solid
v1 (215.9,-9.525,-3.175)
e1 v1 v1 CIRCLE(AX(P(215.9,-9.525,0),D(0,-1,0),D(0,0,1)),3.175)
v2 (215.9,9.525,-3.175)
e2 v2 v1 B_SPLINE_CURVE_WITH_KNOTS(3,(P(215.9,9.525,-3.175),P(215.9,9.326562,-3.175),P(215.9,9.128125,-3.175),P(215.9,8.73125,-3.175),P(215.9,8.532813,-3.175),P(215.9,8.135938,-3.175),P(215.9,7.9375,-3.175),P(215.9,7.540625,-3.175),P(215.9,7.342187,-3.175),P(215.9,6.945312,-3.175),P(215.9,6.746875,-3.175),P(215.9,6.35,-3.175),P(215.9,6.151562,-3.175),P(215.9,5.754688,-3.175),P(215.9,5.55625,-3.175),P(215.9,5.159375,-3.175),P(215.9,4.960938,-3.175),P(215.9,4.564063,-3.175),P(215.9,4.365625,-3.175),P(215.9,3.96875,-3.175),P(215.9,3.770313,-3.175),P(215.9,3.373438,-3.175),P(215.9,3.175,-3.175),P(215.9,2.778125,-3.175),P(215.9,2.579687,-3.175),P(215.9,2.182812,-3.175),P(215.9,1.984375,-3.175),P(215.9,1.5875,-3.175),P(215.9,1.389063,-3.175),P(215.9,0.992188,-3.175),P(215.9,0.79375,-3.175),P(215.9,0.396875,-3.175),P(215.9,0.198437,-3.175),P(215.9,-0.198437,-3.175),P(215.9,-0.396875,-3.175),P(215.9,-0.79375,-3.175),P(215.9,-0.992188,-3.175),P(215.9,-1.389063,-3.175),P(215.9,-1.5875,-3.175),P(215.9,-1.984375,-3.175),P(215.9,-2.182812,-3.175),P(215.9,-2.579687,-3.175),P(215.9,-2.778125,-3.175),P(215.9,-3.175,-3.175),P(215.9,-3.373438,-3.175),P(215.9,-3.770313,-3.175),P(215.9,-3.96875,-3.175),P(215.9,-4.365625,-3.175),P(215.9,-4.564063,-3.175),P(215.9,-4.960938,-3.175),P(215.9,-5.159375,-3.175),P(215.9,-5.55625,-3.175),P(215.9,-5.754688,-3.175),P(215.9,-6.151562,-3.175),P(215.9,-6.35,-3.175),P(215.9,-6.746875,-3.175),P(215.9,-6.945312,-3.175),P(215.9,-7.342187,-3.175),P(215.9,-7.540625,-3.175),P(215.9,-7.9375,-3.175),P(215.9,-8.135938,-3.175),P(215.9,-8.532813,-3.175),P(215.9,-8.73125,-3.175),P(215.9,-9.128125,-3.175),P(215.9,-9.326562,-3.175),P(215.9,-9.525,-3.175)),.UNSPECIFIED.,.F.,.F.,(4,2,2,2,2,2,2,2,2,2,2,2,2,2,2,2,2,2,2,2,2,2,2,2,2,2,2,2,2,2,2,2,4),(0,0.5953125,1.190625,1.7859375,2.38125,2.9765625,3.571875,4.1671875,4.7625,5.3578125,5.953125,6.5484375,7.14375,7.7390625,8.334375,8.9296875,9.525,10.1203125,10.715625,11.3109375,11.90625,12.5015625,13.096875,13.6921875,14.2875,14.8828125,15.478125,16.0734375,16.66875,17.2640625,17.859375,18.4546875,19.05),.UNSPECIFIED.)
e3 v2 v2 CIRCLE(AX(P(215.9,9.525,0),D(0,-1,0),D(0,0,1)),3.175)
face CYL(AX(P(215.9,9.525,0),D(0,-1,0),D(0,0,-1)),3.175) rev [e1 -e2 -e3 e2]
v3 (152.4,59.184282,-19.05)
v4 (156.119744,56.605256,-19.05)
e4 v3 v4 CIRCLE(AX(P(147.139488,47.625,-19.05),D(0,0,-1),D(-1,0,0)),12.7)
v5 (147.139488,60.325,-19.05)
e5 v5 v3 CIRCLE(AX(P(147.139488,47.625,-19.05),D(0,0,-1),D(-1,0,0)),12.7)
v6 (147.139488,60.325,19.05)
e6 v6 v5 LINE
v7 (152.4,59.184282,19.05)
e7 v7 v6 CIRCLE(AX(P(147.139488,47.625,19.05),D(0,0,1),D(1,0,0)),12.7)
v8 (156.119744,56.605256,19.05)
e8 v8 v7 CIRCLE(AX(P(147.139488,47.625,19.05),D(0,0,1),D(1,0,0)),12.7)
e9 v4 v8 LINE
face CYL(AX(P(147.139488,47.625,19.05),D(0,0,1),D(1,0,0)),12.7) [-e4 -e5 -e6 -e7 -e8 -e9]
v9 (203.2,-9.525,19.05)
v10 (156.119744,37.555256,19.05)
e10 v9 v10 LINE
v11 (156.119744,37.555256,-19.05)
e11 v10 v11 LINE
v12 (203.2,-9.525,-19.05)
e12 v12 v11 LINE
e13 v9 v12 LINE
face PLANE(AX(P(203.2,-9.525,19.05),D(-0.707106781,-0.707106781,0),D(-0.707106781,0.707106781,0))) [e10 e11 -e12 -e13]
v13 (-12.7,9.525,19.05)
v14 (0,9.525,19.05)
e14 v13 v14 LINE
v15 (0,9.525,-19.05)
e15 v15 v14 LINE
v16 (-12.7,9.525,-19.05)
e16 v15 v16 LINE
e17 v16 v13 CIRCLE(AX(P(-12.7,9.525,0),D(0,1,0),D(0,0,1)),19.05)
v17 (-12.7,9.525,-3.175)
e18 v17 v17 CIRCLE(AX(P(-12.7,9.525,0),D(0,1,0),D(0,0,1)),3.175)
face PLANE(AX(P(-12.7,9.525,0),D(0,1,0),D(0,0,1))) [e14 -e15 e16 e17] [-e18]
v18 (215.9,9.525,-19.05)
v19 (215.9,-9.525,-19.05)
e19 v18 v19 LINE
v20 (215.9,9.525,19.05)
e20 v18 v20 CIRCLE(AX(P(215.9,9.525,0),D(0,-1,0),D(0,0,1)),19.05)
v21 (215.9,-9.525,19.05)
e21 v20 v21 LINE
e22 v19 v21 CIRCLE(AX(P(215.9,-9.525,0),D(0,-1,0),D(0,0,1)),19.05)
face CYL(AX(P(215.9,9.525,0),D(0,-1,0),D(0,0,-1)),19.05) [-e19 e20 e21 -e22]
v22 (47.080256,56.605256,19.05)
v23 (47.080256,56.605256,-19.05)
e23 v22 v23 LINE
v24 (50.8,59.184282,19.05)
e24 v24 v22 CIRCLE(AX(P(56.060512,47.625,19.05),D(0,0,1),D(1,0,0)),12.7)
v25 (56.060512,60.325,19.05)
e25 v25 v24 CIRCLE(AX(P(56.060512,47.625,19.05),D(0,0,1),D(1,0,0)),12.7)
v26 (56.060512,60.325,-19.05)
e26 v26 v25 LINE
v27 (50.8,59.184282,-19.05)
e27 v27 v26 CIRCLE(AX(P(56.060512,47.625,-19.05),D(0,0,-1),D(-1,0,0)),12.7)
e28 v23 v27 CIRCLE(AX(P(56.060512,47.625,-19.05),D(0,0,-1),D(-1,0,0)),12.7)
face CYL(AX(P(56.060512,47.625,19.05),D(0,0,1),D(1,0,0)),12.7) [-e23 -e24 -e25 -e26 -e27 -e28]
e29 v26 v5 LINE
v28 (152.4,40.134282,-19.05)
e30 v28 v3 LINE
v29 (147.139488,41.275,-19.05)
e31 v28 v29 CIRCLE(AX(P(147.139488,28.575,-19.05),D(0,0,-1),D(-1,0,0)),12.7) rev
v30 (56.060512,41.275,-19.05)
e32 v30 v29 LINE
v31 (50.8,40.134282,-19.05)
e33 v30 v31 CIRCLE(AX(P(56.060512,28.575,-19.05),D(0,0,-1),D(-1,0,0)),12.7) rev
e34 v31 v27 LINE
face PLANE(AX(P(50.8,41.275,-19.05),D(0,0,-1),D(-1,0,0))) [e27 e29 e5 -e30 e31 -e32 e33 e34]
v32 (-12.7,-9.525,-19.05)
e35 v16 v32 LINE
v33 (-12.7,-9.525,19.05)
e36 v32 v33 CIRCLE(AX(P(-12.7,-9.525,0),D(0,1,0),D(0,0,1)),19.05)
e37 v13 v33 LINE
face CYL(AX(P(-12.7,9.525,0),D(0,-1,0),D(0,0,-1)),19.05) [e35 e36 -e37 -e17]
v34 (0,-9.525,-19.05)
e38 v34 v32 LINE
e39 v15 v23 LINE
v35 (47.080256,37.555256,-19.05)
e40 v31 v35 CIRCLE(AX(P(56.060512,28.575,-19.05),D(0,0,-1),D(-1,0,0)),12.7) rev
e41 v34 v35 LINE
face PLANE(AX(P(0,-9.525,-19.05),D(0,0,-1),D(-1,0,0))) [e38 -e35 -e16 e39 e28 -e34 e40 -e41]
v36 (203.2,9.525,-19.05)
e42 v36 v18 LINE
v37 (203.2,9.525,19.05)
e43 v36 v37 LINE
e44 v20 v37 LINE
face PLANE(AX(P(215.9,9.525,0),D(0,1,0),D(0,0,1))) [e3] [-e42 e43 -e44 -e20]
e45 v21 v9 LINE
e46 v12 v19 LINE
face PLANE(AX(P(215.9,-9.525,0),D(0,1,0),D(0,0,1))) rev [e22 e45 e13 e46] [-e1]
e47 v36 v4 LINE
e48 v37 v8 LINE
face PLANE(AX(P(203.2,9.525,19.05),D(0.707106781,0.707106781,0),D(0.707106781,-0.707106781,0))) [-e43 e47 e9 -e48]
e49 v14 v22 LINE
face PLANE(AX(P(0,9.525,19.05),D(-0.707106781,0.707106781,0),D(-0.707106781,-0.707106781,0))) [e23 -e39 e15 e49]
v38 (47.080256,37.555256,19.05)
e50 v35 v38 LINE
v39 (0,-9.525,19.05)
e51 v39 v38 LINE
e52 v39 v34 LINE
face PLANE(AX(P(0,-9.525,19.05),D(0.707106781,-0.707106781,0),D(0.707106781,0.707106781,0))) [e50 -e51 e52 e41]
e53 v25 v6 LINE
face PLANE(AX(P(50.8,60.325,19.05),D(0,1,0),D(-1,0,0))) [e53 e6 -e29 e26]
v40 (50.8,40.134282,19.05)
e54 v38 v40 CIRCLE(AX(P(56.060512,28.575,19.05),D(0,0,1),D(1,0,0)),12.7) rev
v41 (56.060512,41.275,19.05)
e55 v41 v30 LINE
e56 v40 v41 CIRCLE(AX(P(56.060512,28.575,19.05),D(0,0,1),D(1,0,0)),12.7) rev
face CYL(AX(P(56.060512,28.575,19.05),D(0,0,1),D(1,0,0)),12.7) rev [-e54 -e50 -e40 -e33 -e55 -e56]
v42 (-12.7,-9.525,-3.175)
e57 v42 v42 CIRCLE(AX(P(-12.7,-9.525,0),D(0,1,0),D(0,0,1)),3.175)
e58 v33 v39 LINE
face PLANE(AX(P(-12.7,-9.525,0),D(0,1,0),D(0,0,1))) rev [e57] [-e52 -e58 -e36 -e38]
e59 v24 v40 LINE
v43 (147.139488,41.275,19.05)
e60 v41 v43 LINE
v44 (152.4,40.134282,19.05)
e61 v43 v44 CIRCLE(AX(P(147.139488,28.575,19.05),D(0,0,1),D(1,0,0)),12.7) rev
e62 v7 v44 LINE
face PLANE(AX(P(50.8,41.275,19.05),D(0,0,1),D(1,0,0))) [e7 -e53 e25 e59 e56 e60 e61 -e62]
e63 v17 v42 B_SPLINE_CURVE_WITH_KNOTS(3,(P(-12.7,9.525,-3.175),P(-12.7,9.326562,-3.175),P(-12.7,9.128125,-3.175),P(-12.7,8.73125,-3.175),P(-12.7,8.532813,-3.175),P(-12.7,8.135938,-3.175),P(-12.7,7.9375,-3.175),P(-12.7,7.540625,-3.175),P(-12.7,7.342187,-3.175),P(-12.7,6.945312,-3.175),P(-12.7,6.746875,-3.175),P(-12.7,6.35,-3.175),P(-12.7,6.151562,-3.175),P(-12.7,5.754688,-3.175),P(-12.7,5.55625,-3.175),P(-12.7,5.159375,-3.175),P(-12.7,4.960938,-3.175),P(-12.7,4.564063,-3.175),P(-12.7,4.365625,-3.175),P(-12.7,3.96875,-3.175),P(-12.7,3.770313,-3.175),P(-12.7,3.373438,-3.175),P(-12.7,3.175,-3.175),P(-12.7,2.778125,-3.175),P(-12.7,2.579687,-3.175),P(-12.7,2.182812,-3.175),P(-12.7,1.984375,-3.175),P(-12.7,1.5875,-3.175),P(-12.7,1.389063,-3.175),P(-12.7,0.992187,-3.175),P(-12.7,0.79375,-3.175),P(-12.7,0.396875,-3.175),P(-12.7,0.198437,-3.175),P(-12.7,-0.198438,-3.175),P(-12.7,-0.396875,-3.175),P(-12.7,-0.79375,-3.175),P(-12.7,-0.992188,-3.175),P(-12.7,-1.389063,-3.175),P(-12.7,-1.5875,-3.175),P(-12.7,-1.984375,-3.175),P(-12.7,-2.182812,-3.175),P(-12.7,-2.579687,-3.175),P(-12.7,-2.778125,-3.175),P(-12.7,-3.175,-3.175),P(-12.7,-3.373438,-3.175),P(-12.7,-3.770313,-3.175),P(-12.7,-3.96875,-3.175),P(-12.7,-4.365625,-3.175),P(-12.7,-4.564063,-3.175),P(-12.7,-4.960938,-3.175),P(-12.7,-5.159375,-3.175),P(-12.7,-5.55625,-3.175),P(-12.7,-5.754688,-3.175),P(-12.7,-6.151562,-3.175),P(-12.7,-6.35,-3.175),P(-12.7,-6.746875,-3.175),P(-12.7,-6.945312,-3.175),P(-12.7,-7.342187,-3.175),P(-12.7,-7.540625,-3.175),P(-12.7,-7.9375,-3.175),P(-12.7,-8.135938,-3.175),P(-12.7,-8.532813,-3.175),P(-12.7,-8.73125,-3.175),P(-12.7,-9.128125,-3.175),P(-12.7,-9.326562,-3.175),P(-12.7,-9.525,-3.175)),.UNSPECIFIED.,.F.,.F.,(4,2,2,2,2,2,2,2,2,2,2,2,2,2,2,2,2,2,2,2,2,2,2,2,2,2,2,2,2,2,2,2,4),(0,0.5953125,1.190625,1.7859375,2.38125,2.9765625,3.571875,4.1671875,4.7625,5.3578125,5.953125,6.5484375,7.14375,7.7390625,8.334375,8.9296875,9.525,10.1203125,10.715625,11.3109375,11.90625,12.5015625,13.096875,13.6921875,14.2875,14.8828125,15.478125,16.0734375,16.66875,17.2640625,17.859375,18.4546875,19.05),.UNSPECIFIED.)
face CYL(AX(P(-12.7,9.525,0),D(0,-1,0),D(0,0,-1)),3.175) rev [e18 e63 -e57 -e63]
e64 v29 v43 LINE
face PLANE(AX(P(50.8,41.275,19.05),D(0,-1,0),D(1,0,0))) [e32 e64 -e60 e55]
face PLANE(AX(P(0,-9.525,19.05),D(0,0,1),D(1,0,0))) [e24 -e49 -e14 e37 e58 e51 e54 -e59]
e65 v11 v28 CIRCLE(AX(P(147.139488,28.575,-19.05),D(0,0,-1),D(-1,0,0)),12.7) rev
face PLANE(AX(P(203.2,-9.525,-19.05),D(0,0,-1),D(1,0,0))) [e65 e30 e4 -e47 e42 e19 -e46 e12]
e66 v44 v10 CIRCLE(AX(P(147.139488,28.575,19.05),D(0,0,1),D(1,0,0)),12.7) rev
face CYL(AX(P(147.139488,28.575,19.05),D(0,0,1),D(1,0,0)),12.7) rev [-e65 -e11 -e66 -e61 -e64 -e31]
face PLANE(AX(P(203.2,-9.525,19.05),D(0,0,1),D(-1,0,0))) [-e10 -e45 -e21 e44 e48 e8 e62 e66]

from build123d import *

# Parameters (mm, degrees)
SWEEP1_START        = -19.05
SWEEP1_DEPTH        = 38.1
BOSS_EXTRUDE1_START = -9.525
SKETCH4_R           = 3.175
BOSS_EXTRUDE1_DEPTH = 19.05
FILLET1_R           = 12.7


# Read off the part's stored shape, not the designer's step: Sweep1
with BuildPart() as part:
    # Sweep1 outline → Sweep1 (new body)
    with BuildSketch(Plane.XY.offset(SWEEP1_START)):
        Polygon((101.6, 41.275), (101.6, 60.325), (50.8, 60.325), (0, 9.525), (0, -9.525), (50.8, 41.275), align=None)
    extrude(amount=SWEEP1_DEPTH)

    # Sketch4 → Boss-Extrude1 (add)
    with BuildSketch(Plane(origin=(0, 0, 0), x_dir=(1, 0, 0), z_dir=(0, 1, 0)).offset(BOSS_EXTRUDE1_START)):
        with BuildLine():
            Line((0, 19.05), (-12.7, 19.05))
            ThreePointArc((-12.7, 19.05), (-31.75, 0), (-12.7, -19.05))
            Line((-12.7, -19.05), (0, -19.05))
            Line((0, -19.05), (0, 19.05))
        make_face()
        with Locations(Location((-12.7, 0, 0), (0, 0, 90))):
            Circle(SKETCH4_R, mode=Mode.SUBTRACT)
    extrude(amount=BOSS_EXTRUDE1_DEPTH)

    # Mirror4: part across plane


with BuildPart() as part_1:
    add(part.part)
    add(part.part.mirror(Plane(origin=(101.6, 0, 0), x_dir=(0, 0, 1), z_dir=(1, 0, 0))))

    # Fillet1
    fillet1_edges = [part_1.edges().sort_by_distance(p)[0] for p in [
        (50.8, 60.325, 0),
        (50.8, 41.275, 0),
        (152.4, 60.325, 0),
        (152.4, 41.275, 0),
    ]]
    fillet(fillet1_edges, radius=FILLET1_R)


solid = part_1.part
